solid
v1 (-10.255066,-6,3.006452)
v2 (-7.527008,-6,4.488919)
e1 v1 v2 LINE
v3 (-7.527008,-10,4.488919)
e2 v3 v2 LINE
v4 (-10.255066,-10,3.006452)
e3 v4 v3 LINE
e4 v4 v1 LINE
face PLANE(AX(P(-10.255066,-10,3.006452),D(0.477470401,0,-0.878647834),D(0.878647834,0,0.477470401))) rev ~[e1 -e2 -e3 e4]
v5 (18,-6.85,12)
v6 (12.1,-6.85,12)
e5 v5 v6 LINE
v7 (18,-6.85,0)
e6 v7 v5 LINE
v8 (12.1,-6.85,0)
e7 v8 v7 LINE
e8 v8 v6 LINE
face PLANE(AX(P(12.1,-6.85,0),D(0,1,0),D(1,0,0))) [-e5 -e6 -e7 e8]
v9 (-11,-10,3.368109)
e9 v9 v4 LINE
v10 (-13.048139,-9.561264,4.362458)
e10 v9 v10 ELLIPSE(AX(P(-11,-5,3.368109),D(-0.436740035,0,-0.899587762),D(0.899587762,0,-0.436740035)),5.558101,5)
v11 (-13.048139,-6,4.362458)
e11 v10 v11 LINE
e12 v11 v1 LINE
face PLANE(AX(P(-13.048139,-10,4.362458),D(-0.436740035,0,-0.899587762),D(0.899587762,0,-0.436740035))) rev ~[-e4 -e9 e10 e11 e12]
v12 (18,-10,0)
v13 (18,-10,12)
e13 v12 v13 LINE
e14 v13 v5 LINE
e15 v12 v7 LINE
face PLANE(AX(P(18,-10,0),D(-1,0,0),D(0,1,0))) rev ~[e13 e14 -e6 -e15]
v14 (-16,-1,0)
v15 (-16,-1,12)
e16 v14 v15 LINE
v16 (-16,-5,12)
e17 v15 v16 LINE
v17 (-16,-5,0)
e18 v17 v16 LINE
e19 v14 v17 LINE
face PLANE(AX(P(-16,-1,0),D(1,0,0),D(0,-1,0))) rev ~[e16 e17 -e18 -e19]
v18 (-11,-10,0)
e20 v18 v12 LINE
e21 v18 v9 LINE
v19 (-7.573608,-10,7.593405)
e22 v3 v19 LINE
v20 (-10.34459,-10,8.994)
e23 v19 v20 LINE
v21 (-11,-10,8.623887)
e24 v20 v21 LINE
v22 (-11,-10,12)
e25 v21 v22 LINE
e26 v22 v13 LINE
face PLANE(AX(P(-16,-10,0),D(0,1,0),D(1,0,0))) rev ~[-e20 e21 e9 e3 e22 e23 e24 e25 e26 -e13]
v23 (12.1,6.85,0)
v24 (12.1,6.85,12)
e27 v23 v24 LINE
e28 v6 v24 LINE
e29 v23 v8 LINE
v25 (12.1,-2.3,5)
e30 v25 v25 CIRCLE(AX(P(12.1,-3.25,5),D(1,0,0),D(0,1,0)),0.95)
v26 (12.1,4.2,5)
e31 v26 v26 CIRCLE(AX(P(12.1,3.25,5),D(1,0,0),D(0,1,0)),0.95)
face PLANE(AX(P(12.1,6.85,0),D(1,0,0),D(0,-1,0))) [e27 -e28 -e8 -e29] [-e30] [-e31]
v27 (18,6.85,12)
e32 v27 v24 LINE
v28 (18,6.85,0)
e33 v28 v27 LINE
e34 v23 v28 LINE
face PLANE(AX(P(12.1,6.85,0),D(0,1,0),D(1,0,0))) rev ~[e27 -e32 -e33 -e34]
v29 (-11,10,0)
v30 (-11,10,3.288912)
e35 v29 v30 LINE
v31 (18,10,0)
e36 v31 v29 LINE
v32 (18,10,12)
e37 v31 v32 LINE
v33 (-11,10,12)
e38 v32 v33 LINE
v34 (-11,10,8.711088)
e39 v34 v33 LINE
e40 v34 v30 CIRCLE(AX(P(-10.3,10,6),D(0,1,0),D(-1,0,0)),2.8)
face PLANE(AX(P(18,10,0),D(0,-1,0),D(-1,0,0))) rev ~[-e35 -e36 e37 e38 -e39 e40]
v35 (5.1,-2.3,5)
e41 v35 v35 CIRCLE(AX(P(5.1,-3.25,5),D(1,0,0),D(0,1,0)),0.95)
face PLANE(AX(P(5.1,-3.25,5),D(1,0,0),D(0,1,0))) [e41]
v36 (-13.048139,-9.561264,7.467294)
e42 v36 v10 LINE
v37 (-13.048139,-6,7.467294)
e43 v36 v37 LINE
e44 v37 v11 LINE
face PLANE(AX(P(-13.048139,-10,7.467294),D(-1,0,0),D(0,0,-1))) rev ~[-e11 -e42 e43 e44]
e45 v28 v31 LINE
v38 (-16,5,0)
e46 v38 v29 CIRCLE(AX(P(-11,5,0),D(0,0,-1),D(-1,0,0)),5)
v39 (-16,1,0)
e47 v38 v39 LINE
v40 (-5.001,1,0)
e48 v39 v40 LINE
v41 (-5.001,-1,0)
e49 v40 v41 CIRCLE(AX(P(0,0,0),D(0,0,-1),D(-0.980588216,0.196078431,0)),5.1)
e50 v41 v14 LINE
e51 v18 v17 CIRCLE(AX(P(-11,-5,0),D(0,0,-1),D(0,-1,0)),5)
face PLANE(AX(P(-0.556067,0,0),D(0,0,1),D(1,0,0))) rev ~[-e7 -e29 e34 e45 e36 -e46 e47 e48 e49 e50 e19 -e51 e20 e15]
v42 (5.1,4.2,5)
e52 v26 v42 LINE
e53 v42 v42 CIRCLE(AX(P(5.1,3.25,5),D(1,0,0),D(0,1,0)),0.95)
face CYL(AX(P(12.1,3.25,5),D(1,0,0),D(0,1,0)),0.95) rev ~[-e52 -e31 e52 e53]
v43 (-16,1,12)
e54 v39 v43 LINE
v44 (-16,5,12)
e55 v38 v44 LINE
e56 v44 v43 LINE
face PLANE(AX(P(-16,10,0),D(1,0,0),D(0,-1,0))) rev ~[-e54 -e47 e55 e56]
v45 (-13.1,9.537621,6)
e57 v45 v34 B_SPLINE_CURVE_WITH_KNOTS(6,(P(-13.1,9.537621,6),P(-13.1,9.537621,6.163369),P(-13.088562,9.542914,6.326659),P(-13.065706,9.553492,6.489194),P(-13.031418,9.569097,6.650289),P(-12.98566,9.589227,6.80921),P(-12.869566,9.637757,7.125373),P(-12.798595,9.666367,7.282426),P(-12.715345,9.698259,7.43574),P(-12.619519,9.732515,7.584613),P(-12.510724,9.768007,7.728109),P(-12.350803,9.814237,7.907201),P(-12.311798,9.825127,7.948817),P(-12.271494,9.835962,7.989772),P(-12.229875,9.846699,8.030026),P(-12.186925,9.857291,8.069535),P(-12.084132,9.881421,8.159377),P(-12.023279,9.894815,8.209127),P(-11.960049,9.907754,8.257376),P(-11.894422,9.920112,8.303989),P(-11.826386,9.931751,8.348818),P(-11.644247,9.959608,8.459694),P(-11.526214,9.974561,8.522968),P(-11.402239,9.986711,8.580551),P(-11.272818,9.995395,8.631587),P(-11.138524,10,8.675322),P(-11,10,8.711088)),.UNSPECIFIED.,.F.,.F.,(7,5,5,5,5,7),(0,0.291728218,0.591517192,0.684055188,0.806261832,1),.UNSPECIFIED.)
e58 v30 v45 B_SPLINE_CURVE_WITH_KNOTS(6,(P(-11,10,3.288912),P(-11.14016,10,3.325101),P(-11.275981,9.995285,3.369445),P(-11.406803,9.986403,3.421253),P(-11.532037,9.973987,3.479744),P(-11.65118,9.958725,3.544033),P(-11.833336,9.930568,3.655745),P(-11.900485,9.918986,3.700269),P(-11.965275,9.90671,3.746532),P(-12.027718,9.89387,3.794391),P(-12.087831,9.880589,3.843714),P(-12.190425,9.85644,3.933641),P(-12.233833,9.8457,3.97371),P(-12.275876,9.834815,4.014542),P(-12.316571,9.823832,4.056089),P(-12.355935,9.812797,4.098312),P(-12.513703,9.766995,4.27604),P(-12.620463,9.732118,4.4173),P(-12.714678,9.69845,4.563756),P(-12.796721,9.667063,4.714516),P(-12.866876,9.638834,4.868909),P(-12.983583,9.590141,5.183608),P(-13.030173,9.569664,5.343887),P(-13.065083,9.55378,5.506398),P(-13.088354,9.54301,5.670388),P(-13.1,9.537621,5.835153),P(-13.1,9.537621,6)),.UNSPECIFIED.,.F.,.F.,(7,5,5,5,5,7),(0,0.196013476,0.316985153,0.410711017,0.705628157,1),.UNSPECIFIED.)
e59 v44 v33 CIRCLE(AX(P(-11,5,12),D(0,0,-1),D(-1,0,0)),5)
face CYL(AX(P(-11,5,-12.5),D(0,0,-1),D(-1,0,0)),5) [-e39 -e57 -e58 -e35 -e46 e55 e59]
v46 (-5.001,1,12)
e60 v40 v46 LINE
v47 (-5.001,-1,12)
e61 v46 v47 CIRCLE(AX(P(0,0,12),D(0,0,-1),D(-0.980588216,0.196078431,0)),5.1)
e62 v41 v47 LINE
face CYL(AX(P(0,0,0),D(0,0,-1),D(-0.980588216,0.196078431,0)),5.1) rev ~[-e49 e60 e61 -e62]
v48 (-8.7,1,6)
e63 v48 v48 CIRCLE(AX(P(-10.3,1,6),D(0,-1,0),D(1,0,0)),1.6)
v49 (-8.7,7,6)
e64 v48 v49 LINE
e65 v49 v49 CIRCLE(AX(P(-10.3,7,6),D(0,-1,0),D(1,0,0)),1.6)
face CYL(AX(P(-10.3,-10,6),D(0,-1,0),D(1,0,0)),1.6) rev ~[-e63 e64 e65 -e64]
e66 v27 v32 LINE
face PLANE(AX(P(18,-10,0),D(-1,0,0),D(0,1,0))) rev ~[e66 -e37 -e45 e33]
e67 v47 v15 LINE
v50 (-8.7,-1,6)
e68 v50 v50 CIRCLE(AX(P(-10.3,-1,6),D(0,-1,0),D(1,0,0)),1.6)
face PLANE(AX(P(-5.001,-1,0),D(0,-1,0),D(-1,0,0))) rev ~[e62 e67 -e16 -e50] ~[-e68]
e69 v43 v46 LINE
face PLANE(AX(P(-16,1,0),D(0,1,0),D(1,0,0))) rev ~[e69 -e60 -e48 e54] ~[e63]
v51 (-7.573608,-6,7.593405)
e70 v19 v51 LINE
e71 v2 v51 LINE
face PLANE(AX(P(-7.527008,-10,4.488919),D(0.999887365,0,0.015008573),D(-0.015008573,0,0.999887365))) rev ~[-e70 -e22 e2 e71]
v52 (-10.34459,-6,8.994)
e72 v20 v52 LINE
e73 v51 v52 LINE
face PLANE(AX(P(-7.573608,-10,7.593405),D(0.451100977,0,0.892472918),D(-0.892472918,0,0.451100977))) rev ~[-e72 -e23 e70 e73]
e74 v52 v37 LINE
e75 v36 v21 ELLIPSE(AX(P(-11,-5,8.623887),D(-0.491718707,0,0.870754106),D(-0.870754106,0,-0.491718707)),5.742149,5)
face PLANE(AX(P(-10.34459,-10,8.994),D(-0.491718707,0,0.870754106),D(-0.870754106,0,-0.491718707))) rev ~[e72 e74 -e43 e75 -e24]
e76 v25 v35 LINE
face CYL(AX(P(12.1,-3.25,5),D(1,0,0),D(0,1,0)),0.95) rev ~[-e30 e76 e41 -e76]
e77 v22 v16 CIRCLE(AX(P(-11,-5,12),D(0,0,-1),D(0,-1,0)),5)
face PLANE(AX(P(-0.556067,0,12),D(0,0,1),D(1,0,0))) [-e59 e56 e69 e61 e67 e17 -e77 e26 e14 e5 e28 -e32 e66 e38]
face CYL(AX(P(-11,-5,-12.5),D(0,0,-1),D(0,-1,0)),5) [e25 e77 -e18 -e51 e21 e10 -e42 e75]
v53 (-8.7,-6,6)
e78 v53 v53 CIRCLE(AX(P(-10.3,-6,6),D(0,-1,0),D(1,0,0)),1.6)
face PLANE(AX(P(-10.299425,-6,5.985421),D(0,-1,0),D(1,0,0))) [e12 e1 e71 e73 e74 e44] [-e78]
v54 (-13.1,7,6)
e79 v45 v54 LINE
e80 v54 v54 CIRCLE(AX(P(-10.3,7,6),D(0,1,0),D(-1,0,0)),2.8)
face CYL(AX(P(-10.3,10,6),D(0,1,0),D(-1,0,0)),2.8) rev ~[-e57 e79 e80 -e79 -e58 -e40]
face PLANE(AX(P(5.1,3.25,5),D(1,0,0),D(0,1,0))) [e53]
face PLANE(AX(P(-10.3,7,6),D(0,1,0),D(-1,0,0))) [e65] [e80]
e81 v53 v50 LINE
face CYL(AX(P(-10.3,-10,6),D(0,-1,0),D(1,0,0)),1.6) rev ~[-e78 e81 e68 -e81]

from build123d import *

# Parameters (mm, degrees)
F1_DEPTH     = 12
F2_W         = 5.9
F2_H         = 13.7
F3_DEPTH     = 12.001
F4_R         = 1.6
F5_DEPTH     = 20.001
F6_R         = 0.95
F7_DEPTH     = 7
F9_DEPTH     = 4
F10_R        = 2.8
F11_DEPTH    = 3
F12_T1_DEPTH = 37


# Not quite as in the source:
# - a fillet or chamfer that OpenCascade refuses, or shapes differently, is made with other operations: its cross-section is extruded or revolved along the edge and cut away or added


with BuildPart() as f1:
    # F0 (on Top) → F1 (new body)
    with BuildSketch(Plane.XY):
        with BuildLine():
            Line((18, 10), (-16, 10))
            Line((-16, 10), (-16, 1))
            Line((-16, 1), (-5.0009999, 1))
            ThreePointArc((-5.0009999, 1), (5.1, 0), (-5.0009999, -1))
            Line((-5.0009999, -1), (-16, -1))
            Line((-16, -1), (-16, -10))
            Line((-16, -10), (18, -10))
            Line((18, -10), (18, -6.85))
            Line((18, -6.85), (18, 6.85))
            Line((18, 6.85), (18, 10))
        make_face()
    extrude(amount=F1_DEPTH)

    # F2 (on face) → F3 (cut, through all)
    with BuildSketch(Plane(origin=(0, 0, 0), x_dir=(1, 0, 0), z_dir=(0, 0, -1))):
        with Locations((15.05, 0)):
            Rectangle(F2_W, F2_H)
    extrude(amount=-F3_DEPTH, mode=Mode.SUBTRACT)

    # F4 (on face) → F5 (cut, through all)
    with BuildSketch(Plane.XZ.offset(10)):
        with Locations((-10.3, 6)):
            Circle(F4_R)
    extrude(amount=-F5_DEPTH, mode=Mode.SUBTRACT)

    # F6 (on face) → F7 (cut)
    with BuildSketch(Plane.YZ.offset(12.1)):
        with Locations((-3.25, 5)):
            Circle(F6_R)
        with Locations((3.25, 5)):
            Circle(F6_R)
    extrude(amount=-F7_DEPTH, mode=Mode.SUBTRACT)

    # F8 (on face) → F9 (cut)
    with BuildSketch(Plane.XZ.offset(10)):
        Polygon((-7.5270084947, 4.4889189478), (-7.5736076532, 7.5934053818), (-10.3445898285, 8.994), (-13.0481386516, 7.4672939832), (-13.0481386516, 4.3624578361), (-10.2550660504, 3.006451588), align=None)
    extrude(amount=-F9_DEPTH, mode=Mode.SUBTRACT)

    # F10 (on face) → F11 (cut)
    with BuildSketch(Plane(origin=(0, 10, 0), x_dir=(-1, 0, 0), z_dir=(0, 1, 0))):
        with Locations((10.3, 6)):
            Circle(F10_R)
    extrude(amount=-F11_DEPTH, mode=Mode.SUBTRACT)

    # F12: fillet of radius 5 on 2 edges, made by hand

    # F12_s2 → F12_t1 (cut)
    with BuildSketch(Plane.XY.offset(-12.5)):
        with BuildLine():
            ThreePointArc((-11, -10), (-14.5355339059, -8.5355339059), (-16, -5))
            Line((-16, -5), (-16, -10))
            Line((-16, -10), (-11, -10))
        make_face()
        with BuildLine():
            ThreePointArc((-16, 5), (-14.5355339059, 8.5355339059), (-11, 10))
            Line((-11, 10), (-16, 10))
            Line((-16, 10), (-16, 5))
        make_face()
    extrude(amount=F12_T1_DEPTH, mode=Mode.SUBTRACT)


solid = f1.part
